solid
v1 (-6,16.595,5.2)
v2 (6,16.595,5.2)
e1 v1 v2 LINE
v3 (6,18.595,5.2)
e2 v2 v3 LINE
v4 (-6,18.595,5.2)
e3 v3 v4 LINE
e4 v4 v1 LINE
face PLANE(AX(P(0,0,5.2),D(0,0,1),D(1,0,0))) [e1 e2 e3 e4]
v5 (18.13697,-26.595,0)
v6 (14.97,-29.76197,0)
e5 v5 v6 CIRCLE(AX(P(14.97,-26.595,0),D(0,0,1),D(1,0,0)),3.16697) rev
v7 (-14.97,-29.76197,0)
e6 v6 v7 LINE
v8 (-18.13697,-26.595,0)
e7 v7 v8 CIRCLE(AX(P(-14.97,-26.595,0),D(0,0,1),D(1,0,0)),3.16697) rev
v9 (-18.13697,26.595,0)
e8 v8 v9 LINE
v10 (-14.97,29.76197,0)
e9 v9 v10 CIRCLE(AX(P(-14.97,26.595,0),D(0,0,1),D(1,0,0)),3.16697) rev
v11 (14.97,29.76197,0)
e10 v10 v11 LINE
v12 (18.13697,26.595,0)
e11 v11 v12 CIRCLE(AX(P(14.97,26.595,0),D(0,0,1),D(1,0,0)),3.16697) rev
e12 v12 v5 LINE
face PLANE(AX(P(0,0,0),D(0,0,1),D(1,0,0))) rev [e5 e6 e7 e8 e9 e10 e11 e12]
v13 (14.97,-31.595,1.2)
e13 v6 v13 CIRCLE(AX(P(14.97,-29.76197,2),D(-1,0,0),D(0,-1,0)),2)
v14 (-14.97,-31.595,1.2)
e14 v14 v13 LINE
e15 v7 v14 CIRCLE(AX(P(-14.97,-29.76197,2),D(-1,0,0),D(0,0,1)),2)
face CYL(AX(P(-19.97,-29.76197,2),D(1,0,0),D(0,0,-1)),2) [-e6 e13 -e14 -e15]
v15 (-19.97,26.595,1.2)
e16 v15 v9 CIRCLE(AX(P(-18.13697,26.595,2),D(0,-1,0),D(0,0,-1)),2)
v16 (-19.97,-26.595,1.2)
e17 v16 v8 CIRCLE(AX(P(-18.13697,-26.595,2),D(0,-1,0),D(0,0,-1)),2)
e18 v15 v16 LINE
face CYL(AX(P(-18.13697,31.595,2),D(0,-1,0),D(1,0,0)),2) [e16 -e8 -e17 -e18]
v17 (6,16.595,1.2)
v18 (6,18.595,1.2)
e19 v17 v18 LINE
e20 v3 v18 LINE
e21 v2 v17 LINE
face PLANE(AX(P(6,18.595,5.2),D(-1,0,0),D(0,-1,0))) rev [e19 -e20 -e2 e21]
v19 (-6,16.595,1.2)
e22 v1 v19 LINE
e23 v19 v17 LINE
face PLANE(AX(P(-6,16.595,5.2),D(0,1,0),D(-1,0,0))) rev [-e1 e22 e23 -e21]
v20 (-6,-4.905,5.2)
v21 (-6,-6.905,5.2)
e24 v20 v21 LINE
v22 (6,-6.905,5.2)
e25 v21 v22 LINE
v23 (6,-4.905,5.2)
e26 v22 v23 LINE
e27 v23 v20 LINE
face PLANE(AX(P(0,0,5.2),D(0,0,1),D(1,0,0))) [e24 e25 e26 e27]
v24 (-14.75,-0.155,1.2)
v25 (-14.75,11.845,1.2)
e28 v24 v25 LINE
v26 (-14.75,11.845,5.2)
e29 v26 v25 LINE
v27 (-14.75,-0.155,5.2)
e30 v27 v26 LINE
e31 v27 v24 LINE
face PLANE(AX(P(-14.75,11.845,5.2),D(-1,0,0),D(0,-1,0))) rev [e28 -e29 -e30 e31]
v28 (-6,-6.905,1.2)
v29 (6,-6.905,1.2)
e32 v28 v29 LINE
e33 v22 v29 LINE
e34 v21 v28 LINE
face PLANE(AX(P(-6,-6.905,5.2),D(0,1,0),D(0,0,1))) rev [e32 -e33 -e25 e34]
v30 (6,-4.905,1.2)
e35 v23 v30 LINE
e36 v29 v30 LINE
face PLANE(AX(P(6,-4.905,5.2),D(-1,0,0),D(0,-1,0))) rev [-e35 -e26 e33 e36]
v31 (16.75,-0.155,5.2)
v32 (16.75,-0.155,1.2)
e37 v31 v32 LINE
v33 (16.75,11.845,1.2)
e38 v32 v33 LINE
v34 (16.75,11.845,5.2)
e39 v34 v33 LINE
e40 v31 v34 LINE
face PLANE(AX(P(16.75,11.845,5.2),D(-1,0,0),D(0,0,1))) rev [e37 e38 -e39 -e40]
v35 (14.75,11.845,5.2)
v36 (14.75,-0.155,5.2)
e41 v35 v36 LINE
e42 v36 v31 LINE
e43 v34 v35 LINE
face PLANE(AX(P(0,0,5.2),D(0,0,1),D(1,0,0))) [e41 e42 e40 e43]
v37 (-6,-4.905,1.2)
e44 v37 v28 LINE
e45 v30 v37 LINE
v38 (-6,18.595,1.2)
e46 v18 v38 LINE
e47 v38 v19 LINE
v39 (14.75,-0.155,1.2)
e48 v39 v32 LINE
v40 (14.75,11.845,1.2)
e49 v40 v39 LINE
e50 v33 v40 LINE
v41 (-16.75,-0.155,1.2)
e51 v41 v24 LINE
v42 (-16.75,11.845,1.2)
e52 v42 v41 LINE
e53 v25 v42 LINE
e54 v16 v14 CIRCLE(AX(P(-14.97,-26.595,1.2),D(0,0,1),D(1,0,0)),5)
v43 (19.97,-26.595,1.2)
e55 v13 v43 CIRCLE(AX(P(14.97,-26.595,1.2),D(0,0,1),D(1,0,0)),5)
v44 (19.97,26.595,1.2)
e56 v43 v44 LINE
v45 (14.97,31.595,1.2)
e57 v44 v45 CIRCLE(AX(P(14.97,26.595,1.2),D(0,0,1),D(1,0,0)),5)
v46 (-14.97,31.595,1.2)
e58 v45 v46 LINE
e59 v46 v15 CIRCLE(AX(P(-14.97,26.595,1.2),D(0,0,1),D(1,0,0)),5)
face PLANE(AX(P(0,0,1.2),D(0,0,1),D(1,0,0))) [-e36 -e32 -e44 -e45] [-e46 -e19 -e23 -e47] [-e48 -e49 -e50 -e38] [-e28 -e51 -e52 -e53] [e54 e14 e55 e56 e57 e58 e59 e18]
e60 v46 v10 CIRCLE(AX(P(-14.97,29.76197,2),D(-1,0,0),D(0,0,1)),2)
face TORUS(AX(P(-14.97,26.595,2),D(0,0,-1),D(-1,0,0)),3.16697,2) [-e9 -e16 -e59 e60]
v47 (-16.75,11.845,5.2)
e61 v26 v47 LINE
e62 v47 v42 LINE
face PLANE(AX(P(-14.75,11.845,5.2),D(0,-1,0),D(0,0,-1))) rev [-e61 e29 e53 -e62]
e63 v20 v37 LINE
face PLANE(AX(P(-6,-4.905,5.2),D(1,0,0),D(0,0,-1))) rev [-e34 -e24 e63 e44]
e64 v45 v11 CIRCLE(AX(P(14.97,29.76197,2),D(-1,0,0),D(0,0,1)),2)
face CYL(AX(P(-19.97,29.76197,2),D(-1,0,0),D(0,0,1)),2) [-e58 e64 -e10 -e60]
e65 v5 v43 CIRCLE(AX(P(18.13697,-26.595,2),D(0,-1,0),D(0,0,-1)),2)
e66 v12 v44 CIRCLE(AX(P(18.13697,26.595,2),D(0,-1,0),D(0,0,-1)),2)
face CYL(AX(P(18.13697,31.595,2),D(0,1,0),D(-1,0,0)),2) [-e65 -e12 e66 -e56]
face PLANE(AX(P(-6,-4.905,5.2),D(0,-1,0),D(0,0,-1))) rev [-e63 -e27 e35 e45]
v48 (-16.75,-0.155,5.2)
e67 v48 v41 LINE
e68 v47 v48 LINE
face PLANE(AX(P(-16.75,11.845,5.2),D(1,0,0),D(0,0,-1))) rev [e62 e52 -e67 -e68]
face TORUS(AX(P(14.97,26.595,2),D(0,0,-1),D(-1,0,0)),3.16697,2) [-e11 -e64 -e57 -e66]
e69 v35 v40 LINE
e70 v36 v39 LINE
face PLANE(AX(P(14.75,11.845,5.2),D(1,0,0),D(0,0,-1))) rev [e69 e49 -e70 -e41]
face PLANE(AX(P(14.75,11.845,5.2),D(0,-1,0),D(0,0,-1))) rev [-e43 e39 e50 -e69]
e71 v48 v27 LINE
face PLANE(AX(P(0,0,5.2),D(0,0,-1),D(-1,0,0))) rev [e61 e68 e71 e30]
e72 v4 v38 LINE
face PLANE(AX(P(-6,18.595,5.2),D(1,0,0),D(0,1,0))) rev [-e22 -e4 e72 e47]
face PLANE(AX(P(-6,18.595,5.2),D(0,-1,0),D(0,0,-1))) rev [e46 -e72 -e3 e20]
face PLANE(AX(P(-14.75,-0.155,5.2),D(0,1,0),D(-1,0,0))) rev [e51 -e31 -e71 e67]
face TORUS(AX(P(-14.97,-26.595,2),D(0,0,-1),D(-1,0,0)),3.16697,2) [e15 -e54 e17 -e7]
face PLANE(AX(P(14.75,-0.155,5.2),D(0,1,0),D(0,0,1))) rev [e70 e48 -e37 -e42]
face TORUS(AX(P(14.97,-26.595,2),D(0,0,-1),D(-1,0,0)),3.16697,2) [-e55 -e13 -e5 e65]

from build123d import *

# Parameters (mm, degrees)
SKETCH_1_W      = 39.94
SKETCH_1_H      = 63.19
EXTRUDE_1_DEPTH = 1.2
FILLET_1_R      = 5
FILLET_3_R      = 2
SKETCH_5_W      = 2
SKETCH_5_H      = 12
SKETCH_5_W_2    = 12
SKETCH_5_H_2    = 2
EXTRUDE_4_DEPTH = 4


with BuildPart() as part:
    # 草图1 → 凸台-拉伸1 (new body)
    with BuildSketch(Plane.XY):
        Rectangle(SKETCH_1_W, SKETCH_1_H)
    extrude(amount=EXTRUDE_1_DEPTH)

    # 圆角1
    fillet_1_edges = [part.edges().sort_by_distance(p)[0] for p in [
        (19.97, -31.595, 0.6),
        (-19.97, -31.595, 0.6),
        (-19.97, 31.595, 0.6),
        (19.97, 31.595, 0.6),
    ]]
    fillet(fillet_1_edges, radius=FILLET_1_R)

    # 圆角3
    # the kernel refuses this fillet: 2 mm, written as the material it takes off along each edge
    with BuildSketch(Plane(origin=(-14.97, -26.595, 0), x_dir=(0, -1, 0), z_dir=(1, 0, 0))) as fillet_3_piece_1:
        with BuildLine():
            CenterArc((3.166969722, -2), FILLET_3_R, 23.578178478, 66.421821522)
            Line((5, -1.2), (5.036660606, -1.184))
            ThreePointArc((5.036660606, -1.184), (5.04, -0.6), (5.04, 0))
            Line((5.04, 0), (5, 0.04))
            Line((5, 0.04), (3.166969722, 0.04))
            Line((3.166969722, 0.04), (3.166969722, 0))
        make_face()
    revolve(axis=Axis((-14.97, -26.595, 0), (0, 0, -1)), revolution_arc=90, mode=Mode.SUBTRACT)
    with BuildSketch(Plane(origin=(14.97, -31.595, 0), x_dir=(0, 1, 0), z_dir=(-1, 0, 0))) as fillet_3_piece_2:
        with BuildLine():
            CenterArc((1.833030278, -2), FILLET_3_R, 90, 66.421821522)
            Line((0, -1.2), (-0.036660606, -1.184))
            ThreePointArc((-0.036660606, -1.184), (-0.04, -0.6), (-0.04, 0))
            Line((-0.04, 0), (0, 0.04))
            Line((0, 0.04), (1.833030278, 0.04))
            Line((1.833030278, 0.04), (1.833030278, 0))
        make_face()
    extrude(amount=29.94, mode=Mode.SUBTRACT)
    with BuildSketch(Plane(origin=(14.97, -26.595, 0), x_dir=(1, 0, 0), z_dir=(0, 1, 0))) as fillet_3_piece_3:
        with BuildLine():
            CenterArc((3.166969722, -2), FILLET_3_R, 23.578178478, 66.421821522)
            Line((5, -1.2), (5.036660606, -1.184))
            ThreePointArc((5.036660606, -1.184), (5.04, -0.6), (5.04, 0))
            Line((5.04, 0), (5, 0.04))
            Line((5, 0.04), (3.166969722, 0.04))
            Line((3.166969722, 0.04), (3.166969722, 0))
        make_face()
    revolve(axis=Axis((14.97, -26.595, 0), (0, 0, -1)), revolution_arc=90, mode=Mode.SUBTRACT)
    with BuildSketch(Plane(origin=(19.97, 26.595, 0), x_dir=(-1, 0, 0), z_dir=(0, -1, 0)), Plane(origin=(-19.97, -26.595, 0), x_dir=(1, 0, 0), z_dir=(0, 1, 0))) as fillet_3_piece_4:
        with BuildLine():
            CenterArc((1.833030278, -2), FILLET_3_R, 90, 66.421821522)
            Line((0, -1.2), (-0.036660606, -1.184))
            ThreePointArc((-0.036660606, -1.184), (-0.04, -0.6), (-0.04, 0))
            Line((-0.04, 0), (0, 0.04))
            Line((0, 0.04), (1.833030278, 0.04))
            Line((1.833030278, 0.04), (1.833030278, 0))
        make_face()
    extrude(amount=53.19, mode=Mode.SUBTRACT)
    with BuildSketch(Plane(origin=(14.97, 26.595, 0), x_dir=(0, 1, 0), z_dir=(-1, 0, 0))) as fillet_3_piece_5:
        with BuildLine():
            CenterArc((3.166969722, -2), FILLET_3_R, 23.578178478, 66.421821522)
            Line((5, -1.2), (5.036660606, -1.184))
            ThreePointArc((5.036660606, -1.184), (5.04, -0.6), (5.04, 0))
            Line((5.04, 0), (5, 0.04))
            Line((5, 0.04), (3.166969722, 0.04))
            Line((3.166969722, 0.04), (3.166969722, 0))
        make_face()
    revolve(axis=Axis((14.97, 26.595, 0), (0, 0, -1)), revolution_arc=90, mode=Mode.SUBTRACT)
    with BuildSketch(Plane(origin=(-14.97, 31.595, 0), x_dir=(0, 0, 1), z_dir=(1, 0, 0))) as fillet_3_piece_6:
        with BuildLine():
            CenterArc((2, 1.833030278), FILLET_3_R, 180, 66.421821522)
            Line((0, 1.833030278), (-0.04, 1.833030278))
            Line((-0.04, 1.833030278), (-0.04, 0))
            Line((-0.04, 0), (0, -0.04))
            ThreePointArc((0, -0.04), (0.6, -0.04), (1.184, -0.036660606))
            Line((1.184, -0.036660606), (1.2, 0))
        make_face()
    extrude(amount=29.94, mode=Mode.SUBTRACT)
    with BuildSketch(Plane(origin=(-14.97, 26.595, 0), x_dir=(0, 1, 0), z_dir=(1, 0, 0))) as fillet_3_piece_7:
        with BuildLine():
            CenterArc((3.166969722, 2), FILLET_3_R, 270, 66.421821522)
            Line((5, 1.2), (5.036660606, 1.184))
            ThreePointArc((5.036660606, 1.184), (5.04, 0.6), (5.04, 0))
            Line((5.04, 0), (5, -0.04))
            Line((5, -0.04), (3.166969722, -0.04))
            Line((3.166969722, -0.04), (3.166969722, 0))
        make_face()
    revolve(axis=Axis((-14.97, 26.595, 0), (0, 0, 1)), revolution_arc=90, mode=Mode.SUBTRACT)

    # 草图5 → 凸台-拉伸4 (add)
    with BuildSketch(Plane.XY.offset(1.2)):
        with Locations((-15.75, 5.845)):
            Rectangle(SKETCH_5_W, SKETCH_5_H)
        with Locations((0, 17.595)):
            Rectangle(SKETCH_5_W_2, SKETCH_5_H_2)
        with Locations((0, -5.905)):
            Rectangle(SKETCH_5_W_2, SKETCH_5_H_2)
        with Locations((15.75, 5.845)):
            Rectangle(SKETCH_5_W, SKETCH_5_H)
    extrude(amount=EXTRUDE_4_DEPTH)


solid = part.part
